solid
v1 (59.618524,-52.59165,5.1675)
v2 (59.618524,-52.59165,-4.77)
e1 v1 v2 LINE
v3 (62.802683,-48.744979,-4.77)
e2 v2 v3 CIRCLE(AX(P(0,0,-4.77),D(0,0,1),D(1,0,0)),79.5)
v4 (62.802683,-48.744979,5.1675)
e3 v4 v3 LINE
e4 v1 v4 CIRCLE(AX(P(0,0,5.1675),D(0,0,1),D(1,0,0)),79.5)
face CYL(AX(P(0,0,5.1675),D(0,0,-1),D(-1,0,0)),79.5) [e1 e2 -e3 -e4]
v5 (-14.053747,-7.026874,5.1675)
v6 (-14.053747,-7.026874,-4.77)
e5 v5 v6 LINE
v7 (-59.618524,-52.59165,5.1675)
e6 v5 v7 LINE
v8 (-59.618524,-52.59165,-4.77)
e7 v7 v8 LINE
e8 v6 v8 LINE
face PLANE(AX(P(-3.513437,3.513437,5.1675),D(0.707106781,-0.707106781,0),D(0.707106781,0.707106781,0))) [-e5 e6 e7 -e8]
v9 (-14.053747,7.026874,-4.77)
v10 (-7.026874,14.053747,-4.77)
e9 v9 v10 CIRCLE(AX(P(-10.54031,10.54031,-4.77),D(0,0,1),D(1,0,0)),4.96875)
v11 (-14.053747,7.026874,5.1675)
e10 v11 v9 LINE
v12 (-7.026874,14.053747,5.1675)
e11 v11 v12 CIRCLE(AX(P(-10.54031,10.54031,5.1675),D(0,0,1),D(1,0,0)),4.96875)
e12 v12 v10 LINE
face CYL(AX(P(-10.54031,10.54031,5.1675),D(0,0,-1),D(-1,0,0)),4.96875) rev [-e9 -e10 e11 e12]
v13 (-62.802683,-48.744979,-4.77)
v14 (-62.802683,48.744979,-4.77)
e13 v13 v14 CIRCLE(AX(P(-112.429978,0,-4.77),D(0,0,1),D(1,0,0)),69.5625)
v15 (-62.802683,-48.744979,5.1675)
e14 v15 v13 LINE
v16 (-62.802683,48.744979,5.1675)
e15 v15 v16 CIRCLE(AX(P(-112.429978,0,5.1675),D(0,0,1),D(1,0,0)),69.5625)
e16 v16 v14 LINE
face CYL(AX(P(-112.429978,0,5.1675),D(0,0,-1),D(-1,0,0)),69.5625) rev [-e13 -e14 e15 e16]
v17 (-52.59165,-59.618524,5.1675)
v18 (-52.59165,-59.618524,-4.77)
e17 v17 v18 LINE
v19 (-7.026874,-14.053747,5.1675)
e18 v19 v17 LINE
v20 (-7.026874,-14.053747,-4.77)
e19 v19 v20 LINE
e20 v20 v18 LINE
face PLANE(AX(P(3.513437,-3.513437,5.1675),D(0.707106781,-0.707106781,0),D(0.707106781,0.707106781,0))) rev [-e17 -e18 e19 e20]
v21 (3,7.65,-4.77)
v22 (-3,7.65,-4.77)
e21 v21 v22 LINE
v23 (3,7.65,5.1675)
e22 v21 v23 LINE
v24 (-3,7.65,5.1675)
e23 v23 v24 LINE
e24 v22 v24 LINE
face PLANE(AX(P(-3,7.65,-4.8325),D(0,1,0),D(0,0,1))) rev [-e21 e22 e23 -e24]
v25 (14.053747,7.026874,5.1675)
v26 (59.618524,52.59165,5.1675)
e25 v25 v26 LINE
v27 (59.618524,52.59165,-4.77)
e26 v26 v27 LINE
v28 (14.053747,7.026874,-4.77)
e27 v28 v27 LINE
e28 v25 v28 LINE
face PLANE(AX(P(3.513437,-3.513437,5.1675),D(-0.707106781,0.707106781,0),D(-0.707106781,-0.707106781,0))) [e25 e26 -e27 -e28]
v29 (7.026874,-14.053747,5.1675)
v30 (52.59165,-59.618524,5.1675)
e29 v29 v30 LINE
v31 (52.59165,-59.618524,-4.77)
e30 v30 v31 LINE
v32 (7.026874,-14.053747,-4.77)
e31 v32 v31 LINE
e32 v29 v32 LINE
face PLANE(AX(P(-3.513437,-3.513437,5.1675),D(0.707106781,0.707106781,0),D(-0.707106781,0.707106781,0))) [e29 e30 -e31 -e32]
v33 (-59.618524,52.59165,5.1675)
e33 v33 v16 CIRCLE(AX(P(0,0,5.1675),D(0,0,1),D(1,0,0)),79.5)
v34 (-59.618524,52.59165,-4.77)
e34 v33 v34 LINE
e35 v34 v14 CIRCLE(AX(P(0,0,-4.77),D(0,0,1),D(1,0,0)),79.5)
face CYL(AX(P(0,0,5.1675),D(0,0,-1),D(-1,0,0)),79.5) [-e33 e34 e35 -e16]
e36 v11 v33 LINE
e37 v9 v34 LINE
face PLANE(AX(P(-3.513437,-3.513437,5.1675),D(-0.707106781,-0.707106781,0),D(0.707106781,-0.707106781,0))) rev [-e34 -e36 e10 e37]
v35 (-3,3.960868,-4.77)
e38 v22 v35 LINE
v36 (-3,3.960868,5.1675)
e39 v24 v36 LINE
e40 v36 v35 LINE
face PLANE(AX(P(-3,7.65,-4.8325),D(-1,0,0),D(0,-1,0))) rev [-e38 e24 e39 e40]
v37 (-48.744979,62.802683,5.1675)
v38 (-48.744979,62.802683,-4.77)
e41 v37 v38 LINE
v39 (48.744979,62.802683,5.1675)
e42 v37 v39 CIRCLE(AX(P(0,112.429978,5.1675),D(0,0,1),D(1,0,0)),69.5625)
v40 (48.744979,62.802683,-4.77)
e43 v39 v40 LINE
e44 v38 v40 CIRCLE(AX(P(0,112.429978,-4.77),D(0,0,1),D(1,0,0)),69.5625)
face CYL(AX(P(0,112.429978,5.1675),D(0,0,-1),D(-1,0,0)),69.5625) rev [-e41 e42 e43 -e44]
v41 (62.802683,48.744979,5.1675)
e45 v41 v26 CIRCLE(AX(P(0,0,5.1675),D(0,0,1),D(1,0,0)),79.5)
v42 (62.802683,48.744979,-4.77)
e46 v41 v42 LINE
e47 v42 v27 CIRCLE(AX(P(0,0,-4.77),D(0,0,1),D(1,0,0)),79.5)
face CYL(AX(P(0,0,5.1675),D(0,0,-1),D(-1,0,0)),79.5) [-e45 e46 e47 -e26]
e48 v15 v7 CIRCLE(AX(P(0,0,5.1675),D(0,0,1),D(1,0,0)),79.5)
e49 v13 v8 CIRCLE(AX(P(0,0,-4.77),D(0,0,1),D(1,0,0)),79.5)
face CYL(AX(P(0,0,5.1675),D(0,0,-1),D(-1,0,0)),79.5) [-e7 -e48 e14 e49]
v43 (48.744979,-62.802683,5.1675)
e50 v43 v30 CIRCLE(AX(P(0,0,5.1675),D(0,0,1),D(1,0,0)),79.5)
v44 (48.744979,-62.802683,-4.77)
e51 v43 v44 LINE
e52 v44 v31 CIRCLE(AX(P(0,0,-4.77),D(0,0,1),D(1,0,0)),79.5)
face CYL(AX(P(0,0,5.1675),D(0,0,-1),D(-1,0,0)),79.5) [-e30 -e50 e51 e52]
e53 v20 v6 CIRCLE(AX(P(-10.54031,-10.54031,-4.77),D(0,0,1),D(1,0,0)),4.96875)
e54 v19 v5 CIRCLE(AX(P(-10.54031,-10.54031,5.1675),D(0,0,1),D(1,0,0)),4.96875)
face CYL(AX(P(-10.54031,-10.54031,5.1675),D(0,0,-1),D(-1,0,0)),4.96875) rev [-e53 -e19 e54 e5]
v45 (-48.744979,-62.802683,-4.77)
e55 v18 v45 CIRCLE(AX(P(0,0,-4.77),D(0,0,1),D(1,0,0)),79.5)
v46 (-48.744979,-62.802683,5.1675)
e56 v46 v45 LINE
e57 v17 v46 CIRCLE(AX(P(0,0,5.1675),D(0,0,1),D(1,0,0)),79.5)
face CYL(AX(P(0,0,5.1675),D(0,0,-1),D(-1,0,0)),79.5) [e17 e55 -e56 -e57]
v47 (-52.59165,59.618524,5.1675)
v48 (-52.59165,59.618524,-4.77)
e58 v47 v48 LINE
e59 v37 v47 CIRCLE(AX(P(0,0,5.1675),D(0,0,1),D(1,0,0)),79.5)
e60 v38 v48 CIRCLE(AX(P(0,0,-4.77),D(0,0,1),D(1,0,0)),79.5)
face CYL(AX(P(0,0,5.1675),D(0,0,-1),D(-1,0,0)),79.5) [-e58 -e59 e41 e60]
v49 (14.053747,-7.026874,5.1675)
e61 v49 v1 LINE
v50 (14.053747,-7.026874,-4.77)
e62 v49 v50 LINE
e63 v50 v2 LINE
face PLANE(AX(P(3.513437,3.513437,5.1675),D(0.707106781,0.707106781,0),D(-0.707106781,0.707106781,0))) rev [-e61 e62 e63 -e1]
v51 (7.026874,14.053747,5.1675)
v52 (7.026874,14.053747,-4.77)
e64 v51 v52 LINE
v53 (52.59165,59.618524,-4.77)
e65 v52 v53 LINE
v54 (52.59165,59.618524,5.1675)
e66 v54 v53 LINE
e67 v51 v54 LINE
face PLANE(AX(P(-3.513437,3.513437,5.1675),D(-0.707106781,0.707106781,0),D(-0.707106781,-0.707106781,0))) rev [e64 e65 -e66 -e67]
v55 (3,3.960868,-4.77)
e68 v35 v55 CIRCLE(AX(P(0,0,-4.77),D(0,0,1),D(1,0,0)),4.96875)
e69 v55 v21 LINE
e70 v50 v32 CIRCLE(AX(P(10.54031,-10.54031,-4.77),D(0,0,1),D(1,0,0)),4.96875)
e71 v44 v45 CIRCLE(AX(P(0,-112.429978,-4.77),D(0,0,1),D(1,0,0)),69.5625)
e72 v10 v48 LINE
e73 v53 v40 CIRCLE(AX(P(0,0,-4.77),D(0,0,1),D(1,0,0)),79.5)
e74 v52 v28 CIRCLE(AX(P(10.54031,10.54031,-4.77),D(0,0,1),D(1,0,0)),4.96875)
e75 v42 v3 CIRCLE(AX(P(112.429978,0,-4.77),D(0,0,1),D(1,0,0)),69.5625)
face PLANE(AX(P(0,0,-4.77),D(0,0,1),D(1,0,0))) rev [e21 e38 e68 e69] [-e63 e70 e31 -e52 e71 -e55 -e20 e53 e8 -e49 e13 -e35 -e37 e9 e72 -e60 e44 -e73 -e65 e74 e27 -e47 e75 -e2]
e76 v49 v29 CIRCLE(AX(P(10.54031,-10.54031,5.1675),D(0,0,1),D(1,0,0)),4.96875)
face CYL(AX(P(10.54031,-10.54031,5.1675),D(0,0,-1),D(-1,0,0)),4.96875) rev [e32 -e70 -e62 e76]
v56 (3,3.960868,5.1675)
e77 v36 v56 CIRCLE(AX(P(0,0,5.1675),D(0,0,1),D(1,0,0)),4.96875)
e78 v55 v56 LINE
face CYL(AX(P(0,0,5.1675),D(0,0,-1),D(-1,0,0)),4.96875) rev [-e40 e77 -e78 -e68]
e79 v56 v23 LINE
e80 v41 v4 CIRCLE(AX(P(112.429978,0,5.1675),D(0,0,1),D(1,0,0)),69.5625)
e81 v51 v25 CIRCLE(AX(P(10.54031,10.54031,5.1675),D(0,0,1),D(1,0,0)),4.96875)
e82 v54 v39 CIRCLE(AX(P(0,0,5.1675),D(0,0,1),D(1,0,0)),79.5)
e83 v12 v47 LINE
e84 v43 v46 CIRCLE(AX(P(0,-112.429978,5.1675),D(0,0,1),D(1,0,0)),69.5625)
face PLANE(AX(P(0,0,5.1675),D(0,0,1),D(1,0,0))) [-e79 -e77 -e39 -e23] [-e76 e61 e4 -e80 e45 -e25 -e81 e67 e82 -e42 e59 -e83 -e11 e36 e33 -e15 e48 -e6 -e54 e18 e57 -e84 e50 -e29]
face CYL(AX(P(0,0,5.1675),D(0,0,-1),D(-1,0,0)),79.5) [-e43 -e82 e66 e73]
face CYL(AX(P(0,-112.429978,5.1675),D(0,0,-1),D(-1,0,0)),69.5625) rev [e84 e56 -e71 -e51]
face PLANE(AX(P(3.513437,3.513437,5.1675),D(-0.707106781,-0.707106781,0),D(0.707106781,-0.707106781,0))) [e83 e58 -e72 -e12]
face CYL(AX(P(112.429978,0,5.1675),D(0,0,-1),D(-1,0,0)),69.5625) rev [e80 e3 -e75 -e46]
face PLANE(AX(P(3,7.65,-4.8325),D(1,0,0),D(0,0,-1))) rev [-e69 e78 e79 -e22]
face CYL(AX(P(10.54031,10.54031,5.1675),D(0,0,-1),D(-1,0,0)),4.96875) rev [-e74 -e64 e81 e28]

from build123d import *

# Parameters (mm, degrees)
EXTRUDE_1_OUTLINE_R = 0.19875
EXTRUDE_1_DEPTH     = 0.3975
SCALE_3_SCALE       = 25
SKETCH_2_W          = 6
SKETCH_2_H          = 7.65
CUT_EXTRUDE_1_DEPTH = 10


# Read off the part's stored shape, not the designer's step: 凸台-拉伸1
with BuildPart() as part:
    # 凸台-拉伸1 outline → 凸台-拉伸1 (new body)
    with BuildSketch(Plane.XY):
        with BuildLine():
            Line((0.281074946, 0.562149891), (2.103665998, 2.384740944))
            ThreePointArc((2.103665998, 2.384740944), (2.027732849, 2.449632522), (1.949799165, 2.512107326))
            ThreePointArc((1.949799165, 2.512107326), (0, 1.714699128), (-1.949799165, 2.512107326))
            ThreePointArc((-1.949799165, 2.512107326), (-2.027732849, 2.449632522), (-2.103665998, 2.384740944))
            Line((-2.103665998, 2.384740944), (-0.281074946, 0.562149891))
            ThreePointArc((-0.281074946, 0.562149891), (-0.281074946, 0.281074946), (-0.562149891, 0.281074946))
            Line((-0.562149891, 0.281074946), (-2.384740944, 2.103665998))
            ThreePointArc((-2.384740944, 2.103665998), (-2.449632522, 2.027732849), (-2.512107326, 1.949799165))
            ThreePointArc((-2.512107326, 1.949799165), (-1.714699128, 0), (-2.512107326, -1.949799165))
            ThreePointArc((-2.512107326, -1.949799165), (-2.449632522, -2.027732849), (-2.384740944, -2.103665998))
            Line((-2.384740944, -2.103665998), (-0.562149891, -0.281074946))
            ThreePointArc((-0.562149891, -0.281074946), (-0.281074946, -0.281074946), (-0.281074946, -0.562149891))
            Line((-0.281074946, -0.562149891), (-2.103665998, -2.384740944))
            ThreePointArc((-2.103665998, -2.384740944), (-2.027732849, -2.449632522), (-1.949799165, -2.512107326))
            ThreePointArc((-1.949799165, -2.512107326), (0, -1.714699128), (1.949799165, -2.512107326))
            ThreePointArc((1.949799165, -2.512107326), (2.027732849, -2.449632522), (2.103665998, -2.384740944))
            Line((2.103665998, -2.384740944), (0.281074946, -0.562149891))
            ThreePointArc((0.281074946, -0.562149891), (0.281074946, -0.281074946), (0.562149891, -0.281074946))
            Line((0.562149891, -0.281074946), (2.384740944, -2.103665998))
            ThreePointArc((2.384740944, -2.103665998), (2.449632522, -2.027732849), (2.512107326, -1.949799165))
            ThreePointArc((2.512107326, -1.949799165), (1.714699128, 0), (2.512107326, 1.949799165))
            ThreePointArc((2.512107326, 1.949799165), (2.449632522, 2.027732849), (2.384740944, 2.103665998))
            Line((2.384740944, 2.103665998), (0.562149891, 0.281074946))
            ThreePointArc((0.562149891, 0.281074946), (0.281074946, 0.281074946), (0.281074946, 0.562149891))
        make_face()
        Circle(EXTRUDE_1_OUTLINE_R, mode=Mode.SUBTRACT)
    extrude(amount=EXTRUDE_1_DEPTH)


with BuildPart() as part_1:
    # 缩放比例3: scaled about (0, 0, 0.19875)
    add(part.part.scale(SCALE_3_SCALE).moved(Location((0, 0, -4.77))))

    # 草图2 → 切除-拉伸1 (cut)
    with BuildSketch(Plane.XY.offset(5.1675)):
        with Locations((0, 3.825)):
            Rectangle(SKETCH_2_W, SKETCH_2_H)
    extrude(amount=-CUT_EXTRUDE_1_DEPTH, mode=Mode.SUBTRACT)


solid = part_1.part
